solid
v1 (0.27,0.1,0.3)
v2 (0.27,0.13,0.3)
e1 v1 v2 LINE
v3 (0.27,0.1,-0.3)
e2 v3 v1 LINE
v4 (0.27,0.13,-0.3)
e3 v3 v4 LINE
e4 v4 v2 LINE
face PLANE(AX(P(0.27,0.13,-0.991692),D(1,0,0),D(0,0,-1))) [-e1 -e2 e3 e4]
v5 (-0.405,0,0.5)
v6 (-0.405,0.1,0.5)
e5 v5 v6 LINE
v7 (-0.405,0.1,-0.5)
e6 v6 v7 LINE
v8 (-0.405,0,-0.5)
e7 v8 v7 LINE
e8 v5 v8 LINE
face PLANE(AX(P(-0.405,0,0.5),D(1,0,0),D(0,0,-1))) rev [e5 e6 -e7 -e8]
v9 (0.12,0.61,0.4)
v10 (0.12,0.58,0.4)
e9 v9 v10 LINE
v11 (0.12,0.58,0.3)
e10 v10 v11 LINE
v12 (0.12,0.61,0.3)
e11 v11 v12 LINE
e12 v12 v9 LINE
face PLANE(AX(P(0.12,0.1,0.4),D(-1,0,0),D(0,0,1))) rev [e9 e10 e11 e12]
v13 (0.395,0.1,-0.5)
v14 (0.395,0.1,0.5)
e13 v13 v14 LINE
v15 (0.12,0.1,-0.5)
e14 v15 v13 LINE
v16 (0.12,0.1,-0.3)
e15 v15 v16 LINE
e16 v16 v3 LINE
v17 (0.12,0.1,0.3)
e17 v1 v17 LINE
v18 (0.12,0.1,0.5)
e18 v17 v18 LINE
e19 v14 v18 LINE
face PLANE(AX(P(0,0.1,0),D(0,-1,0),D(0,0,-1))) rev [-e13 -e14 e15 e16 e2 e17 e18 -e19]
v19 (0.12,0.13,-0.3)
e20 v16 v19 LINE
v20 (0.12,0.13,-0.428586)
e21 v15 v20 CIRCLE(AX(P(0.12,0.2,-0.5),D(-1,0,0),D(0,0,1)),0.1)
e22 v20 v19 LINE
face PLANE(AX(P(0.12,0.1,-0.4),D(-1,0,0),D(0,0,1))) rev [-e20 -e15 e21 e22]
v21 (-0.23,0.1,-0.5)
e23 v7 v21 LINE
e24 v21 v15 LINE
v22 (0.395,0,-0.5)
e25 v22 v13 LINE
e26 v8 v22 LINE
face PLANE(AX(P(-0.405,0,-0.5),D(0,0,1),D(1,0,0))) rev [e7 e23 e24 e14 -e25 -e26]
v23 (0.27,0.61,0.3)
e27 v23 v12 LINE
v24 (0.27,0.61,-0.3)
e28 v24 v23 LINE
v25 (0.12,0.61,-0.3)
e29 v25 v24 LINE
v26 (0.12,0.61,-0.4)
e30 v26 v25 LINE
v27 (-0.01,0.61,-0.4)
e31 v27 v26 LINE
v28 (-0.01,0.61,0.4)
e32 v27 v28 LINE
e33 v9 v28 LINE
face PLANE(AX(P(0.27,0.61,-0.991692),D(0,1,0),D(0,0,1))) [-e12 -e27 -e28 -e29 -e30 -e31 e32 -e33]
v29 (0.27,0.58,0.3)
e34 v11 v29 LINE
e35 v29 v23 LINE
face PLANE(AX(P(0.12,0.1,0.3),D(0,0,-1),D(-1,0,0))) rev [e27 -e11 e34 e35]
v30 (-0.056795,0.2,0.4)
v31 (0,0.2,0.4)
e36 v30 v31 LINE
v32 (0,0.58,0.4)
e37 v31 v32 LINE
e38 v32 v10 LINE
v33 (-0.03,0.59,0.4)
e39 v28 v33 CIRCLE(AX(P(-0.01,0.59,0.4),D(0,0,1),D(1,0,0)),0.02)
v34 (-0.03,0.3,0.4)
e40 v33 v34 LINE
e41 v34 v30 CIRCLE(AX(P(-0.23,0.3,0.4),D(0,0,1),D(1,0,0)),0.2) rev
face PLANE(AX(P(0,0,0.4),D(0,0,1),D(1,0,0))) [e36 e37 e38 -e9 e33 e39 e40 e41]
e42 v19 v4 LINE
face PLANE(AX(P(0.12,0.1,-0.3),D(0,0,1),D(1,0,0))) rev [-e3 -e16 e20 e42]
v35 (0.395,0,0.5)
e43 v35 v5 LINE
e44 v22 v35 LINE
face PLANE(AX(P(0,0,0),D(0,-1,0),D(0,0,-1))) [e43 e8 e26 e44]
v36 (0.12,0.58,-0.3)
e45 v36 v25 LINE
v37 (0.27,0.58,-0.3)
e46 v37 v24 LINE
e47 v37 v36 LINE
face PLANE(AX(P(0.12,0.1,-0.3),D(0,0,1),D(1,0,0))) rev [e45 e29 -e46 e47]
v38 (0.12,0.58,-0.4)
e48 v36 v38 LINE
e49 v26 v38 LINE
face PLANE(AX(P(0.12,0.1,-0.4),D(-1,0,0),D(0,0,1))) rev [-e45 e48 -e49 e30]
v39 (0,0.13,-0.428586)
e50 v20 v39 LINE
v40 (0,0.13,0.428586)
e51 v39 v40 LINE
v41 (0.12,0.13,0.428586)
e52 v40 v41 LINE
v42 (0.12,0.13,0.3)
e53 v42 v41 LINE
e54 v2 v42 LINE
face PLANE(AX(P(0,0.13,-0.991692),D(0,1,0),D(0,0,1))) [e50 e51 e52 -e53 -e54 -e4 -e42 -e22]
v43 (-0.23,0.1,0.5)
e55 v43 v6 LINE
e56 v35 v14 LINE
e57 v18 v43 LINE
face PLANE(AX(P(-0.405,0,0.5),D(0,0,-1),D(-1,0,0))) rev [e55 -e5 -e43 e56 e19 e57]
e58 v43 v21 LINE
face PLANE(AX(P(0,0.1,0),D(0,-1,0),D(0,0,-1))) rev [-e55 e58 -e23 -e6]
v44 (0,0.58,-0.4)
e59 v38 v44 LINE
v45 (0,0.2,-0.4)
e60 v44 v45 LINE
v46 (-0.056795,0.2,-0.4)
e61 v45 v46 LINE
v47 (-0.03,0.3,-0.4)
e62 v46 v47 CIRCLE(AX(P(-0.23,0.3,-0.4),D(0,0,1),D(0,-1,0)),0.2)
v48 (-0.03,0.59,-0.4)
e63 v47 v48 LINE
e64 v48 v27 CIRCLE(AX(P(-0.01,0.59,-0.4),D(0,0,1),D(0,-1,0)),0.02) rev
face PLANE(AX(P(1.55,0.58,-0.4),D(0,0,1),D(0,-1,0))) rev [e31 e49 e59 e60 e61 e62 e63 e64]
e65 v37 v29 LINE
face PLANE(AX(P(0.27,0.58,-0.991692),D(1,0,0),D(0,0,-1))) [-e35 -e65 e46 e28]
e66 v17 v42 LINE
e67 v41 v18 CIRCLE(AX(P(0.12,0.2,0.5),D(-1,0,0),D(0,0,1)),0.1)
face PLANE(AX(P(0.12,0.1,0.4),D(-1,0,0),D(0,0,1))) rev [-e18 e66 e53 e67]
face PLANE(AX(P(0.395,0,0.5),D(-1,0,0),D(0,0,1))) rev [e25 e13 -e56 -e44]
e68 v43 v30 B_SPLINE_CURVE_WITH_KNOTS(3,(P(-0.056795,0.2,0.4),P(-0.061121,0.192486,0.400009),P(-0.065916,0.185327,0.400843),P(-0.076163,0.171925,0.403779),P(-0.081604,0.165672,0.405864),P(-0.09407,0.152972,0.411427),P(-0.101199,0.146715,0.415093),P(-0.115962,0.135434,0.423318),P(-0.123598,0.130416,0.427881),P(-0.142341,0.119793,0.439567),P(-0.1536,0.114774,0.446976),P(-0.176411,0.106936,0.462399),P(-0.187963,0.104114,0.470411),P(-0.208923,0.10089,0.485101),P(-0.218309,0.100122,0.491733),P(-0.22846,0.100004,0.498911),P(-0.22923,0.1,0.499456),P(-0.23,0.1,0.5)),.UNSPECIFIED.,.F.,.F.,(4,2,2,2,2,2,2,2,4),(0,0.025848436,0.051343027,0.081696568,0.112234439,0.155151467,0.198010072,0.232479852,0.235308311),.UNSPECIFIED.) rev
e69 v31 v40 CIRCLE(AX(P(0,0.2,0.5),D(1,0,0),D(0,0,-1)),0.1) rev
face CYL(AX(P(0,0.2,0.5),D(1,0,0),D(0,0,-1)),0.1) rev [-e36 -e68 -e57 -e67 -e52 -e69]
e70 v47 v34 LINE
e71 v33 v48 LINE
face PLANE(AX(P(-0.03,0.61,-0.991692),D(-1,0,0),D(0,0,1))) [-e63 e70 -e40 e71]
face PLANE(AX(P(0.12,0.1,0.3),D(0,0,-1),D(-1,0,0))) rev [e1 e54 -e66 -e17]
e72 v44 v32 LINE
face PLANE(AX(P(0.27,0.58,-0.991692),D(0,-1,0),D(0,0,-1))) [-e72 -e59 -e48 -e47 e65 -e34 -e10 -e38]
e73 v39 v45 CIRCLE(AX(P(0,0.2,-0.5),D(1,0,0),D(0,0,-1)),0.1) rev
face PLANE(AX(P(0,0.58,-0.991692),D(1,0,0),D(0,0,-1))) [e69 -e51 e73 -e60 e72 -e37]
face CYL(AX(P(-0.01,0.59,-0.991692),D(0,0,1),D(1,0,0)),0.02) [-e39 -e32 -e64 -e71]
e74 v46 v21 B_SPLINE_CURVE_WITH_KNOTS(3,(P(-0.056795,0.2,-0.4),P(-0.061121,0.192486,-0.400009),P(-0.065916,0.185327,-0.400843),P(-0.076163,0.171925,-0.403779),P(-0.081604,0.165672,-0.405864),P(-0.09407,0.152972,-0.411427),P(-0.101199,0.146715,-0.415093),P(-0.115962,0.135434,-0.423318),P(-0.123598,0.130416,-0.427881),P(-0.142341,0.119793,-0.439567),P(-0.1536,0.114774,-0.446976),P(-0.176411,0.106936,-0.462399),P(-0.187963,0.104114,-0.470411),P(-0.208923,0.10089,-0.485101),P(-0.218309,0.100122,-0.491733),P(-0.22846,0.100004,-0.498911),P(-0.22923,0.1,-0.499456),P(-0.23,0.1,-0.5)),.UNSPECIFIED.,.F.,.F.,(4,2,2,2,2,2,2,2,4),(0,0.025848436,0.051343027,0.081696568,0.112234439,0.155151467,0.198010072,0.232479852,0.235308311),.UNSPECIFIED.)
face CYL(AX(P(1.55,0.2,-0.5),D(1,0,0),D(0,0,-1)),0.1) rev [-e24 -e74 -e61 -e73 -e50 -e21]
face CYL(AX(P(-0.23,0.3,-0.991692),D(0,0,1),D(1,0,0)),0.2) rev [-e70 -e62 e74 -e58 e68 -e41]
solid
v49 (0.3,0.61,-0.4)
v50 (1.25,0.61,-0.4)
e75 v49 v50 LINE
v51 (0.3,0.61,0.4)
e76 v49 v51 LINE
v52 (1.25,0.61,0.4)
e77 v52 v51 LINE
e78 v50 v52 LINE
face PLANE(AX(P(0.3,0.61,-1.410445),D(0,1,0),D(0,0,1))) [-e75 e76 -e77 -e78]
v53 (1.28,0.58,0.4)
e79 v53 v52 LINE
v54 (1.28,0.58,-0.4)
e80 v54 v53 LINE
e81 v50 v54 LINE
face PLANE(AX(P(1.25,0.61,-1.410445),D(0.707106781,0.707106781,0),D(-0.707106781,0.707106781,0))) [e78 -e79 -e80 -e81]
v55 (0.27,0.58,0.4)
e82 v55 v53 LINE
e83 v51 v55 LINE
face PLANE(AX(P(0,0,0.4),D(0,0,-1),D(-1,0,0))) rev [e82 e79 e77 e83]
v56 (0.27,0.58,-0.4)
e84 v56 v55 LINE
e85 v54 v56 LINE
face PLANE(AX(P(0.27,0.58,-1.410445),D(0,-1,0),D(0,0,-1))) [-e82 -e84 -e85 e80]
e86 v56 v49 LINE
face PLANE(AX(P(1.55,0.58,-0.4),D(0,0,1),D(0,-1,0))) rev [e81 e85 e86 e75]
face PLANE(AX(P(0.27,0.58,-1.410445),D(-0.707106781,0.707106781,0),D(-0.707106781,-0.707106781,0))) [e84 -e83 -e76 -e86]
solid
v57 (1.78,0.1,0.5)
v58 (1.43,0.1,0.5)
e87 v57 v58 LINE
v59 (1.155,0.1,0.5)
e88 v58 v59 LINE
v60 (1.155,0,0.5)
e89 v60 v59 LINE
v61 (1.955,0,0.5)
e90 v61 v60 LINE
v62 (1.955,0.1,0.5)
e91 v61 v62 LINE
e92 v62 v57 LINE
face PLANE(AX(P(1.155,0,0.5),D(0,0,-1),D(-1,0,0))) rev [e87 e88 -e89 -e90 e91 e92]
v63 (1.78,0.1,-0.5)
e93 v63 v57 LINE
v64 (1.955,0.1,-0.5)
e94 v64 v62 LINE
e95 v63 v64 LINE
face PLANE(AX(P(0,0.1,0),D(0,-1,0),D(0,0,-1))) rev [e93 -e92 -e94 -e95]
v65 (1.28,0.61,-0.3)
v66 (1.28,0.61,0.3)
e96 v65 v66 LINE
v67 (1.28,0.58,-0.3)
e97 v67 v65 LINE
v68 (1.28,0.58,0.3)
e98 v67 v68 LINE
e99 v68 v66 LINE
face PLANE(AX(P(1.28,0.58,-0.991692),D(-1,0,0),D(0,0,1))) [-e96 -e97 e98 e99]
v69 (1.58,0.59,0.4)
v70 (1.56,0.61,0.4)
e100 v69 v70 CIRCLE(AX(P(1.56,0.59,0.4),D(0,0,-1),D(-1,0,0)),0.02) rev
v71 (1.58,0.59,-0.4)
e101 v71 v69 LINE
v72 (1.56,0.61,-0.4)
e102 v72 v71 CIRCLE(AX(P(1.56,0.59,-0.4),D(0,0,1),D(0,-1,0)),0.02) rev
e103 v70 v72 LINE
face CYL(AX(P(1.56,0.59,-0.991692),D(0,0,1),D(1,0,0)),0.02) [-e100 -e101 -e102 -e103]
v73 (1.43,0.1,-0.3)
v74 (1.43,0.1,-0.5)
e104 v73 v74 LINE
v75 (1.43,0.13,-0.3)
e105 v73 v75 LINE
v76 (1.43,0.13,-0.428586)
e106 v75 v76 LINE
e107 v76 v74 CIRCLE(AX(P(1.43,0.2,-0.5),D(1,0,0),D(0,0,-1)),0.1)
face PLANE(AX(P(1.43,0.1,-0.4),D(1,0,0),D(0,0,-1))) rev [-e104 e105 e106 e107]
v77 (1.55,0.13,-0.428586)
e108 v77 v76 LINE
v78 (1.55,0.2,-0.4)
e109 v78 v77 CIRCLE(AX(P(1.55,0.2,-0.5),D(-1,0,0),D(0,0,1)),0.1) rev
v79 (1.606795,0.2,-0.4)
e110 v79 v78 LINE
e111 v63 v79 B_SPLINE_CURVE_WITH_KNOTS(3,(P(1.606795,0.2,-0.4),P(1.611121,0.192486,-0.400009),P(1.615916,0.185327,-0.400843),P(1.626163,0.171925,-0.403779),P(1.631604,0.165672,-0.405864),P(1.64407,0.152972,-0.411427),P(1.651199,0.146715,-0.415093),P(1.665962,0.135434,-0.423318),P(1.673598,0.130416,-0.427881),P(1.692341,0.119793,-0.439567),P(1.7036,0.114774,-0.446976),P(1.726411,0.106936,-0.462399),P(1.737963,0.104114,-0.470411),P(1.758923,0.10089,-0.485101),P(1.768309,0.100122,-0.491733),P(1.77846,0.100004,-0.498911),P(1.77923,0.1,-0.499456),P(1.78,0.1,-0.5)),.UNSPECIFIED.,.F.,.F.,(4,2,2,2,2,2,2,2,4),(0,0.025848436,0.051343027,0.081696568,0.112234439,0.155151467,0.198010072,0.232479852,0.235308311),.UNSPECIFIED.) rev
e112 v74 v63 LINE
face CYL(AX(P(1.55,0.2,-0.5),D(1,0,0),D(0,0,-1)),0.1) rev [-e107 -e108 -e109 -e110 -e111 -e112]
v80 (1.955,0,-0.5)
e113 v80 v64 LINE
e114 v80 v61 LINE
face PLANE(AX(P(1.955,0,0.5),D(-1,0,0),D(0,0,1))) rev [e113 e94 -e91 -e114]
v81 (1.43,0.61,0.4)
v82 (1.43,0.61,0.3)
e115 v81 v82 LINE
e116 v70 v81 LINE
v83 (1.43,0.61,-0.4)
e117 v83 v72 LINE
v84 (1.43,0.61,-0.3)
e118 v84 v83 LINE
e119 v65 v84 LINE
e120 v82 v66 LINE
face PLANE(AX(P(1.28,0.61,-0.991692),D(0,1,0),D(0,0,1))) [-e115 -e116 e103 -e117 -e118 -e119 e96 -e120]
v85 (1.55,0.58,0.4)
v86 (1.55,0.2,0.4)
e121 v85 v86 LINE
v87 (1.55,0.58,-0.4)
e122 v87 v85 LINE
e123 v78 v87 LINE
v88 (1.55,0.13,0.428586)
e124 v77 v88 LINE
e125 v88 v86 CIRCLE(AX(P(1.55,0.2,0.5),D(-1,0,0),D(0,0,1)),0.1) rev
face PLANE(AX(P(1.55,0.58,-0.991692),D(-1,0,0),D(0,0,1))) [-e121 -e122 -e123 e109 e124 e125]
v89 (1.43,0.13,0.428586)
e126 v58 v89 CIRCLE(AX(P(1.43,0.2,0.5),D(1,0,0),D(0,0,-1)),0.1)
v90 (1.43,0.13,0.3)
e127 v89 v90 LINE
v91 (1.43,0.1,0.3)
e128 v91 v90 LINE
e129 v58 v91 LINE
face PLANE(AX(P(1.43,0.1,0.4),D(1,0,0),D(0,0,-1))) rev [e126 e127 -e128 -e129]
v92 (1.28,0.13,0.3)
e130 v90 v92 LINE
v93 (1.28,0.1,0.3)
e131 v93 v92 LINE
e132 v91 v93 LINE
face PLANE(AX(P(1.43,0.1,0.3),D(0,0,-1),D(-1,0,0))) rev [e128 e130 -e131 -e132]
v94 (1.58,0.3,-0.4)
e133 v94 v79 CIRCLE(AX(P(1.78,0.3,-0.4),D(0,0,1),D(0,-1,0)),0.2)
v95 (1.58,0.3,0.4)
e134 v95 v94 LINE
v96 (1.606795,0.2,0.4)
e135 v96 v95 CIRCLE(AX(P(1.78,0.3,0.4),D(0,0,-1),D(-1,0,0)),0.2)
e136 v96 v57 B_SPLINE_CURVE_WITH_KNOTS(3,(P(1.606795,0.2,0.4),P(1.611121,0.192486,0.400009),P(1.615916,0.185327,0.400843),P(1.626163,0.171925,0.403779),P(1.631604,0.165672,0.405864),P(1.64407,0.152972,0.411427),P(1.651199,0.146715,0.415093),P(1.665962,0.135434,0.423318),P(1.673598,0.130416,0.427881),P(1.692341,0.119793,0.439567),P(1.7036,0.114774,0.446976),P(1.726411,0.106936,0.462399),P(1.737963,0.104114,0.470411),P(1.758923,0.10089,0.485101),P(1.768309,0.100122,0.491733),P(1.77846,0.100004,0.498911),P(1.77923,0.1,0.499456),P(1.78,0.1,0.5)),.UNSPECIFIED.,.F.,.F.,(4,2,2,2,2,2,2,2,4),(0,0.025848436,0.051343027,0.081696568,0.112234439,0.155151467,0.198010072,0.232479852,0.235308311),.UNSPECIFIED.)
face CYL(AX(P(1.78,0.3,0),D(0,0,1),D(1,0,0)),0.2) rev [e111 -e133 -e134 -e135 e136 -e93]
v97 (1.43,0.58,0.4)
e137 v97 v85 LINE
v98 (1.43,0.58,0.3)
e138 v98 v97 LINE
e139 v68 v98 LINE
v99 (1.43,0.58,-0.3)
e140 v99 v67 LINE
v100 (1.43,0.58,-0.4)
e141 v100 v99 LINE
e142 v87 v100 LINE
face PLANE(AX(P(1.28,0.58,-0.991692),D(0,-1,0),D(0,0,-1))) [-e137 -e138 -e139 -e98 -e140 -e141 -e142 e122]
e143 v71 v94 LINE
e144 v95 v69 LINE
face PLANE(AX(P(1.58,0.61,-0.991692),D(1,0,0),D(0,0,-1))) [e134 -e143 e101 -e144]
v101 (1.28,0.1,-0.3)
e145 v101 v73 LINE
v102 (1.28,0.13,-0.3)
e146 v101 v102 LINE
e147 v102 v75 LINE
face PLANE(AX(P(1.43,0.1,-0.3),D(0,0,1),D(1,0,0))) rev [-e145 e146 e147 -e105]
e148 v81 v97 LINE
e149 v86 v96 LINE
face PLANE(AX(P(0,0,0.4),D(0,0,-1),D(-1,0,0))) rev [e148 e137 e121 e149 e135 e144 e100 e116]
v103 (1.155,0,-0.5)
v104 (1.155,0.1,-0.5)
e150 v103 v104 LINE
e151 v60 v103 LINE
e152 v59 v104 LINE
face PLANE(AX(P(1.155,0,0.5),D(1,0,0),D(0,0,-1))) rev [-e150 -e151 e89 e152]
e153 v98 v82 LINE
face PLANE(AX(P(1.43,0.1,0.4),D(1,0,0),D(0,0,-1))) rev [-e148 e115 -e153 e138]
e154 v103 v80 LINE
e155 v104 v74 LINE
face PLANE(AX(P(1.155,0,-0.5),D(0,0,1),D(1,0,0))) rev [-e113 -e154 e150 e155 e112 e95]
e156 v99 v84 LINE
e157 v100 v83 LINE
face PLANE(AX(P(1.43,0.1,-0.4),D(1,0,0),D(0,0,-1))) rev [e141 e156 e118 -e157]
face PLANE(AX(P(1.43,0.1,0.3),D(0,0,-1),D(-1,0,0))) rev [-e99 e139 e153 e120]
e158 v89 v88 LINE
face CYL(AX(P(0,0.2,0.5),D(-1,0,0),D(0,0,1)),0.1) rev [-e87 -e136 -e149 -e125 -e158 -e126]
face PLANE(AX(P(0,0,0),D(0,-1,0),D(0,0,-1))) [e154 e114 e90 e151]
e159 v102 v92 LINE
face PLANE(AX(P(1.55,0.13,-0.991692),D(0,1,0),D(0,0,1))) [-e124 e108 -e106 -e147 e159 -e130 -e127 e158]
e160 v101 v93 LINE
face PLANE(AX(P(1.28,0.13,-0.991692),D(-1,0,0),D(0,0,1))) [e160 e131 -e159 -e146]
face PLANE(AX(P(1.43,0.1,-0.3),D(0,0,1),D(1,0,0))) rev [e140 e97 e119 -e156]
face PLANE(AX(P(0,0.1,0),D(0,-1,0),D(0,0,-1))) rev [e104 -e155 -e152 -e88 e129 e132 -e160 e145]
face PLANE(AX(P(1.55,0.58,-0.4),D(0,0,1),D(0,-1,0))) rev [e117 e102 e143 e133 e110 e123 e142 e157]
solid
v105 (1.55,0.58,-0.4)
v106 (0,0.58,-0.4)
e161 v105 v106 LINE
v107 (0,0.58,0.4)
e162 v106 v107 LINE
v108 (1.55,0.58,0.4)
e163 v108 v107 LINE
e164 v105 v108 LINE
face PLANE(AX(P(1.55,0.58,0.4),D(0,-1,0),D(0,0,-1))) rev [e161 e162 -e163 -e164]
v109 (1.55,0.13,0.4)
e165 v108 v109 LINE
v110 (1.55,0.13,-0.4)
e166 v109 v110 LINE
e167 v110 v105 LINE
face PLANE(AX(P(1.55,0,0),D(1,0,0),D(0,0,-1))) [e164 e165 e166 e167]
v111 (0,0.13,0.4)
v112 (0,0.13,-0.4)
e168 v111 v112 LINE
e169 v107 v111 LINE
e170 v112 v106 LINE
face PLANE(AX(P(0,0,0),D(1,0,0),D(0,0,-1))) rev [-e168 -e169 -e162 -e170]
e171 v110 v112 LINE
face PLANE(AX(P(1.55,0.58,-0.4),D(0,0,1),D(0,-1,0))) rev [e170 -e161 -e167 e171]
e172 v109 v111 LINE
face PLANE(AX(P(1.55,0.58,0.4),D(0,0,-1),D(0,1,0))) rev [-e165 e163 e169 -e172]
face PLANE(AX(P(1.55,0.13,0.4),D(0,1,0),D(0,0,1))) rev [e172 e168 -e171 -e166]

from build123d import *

# Parameters (mm, degrees)
SKETCH1_W             = 0.8
SKETCH1_H             = 0.45
BOSS_EXTRUDE1_DEPTH   = 1.55
BOSS_EXTRUDE2_DEPTH   = 0.8
BOSS_EXTRUDE2_2_DEPTH = 0.8
FILLET1_R             = 0.02
FILLET2_R             = 0.02
SKETCH3_W             = 0.15
SKETCH3_H             = 0.1
CUT_EXTRUDE1_DEPTH    = 2.707776332
BOSS_EXTRUDE3_DEPTH   = 0.8
SKETCH5_W             = 0.8
SKETCH5_H             = 1
BOSS_EXTRUDE4_DEPTH   = 0.1
FILLET3_R             = 0.2
FILLET4_R             = 0.2
FILLET5_START         = -0.087971281
FILLET5_DEPTH         = 0.087971281
FILLET5_START_2       = -0.2300001
FILLET5_2_DEPTH       = 0.142028819
FILLET5_START_3       = -0.0299999
FILLET5_3_DEPTH       = 0.1499999
FILLET5_START_4       = -2
FILLET5_4_OUTLINE_W   = 0.12
FILLET5_4_OUTLINE_H   = 0.07
FILLET5_4_DEPTH       = 3
FILLET6_START         = 1.43
FILLET6_DEPTH         = 0.209188627
FILLET6_START_2       = 1.55
FILLET6_2_DEPTH       = 0.0299999
FILLET6_START_3       = -0.5
FILLET6_3_DEPTH       = 1
FILLET6_START_4       = -0.3
FILLET6_4_OUTLINE_W   = 0.359188627
FILLET6_4_OUTLINE_H   = 0.03
FILLET6_4_OUTLINE_W_2 = 0.15
FILLET6_4_DEPTH       = 0.6
FILLET6_5_OUTLINE_W   = 0.209188627
FILLET6_5_OUTLINE_H   = 0.03
FILLET6_5_DEPTH       = 0.9
FILLET6_6_DEPTH       = 0.35


with BuildPart() as part:
    # Sketch1 → Boss-Extrude1 (new body)
    with BuildSketch(Plane(origin=(0, 0, 0), x_dir=(0, 0, -1), z_dir=(1, 0, 0))):
        with Locations((0, 0.355)):
            Rectangle(SKETCH1_W, SKETCH1_H)
    extrude(amount=BOSS_EXTRUDE1_DEPTH)


with BuildPart() as body_2:
    # Sketch2 → Boss-Extrude2 (new body)
    with BuildSketch(Plane.XY.offset(0.4)):
        Polygon((0.27, 0.58), (0, 0.58), (0, 0.13), (0.27, 0.13), (0.27, 0.1), (-0.03, 0.1), (-0.03, 0.61), (0.27, 0.61), align=None)
    extrude(amount=-BOSS_EXTRUDE2_DEPTH)

    # Fillet2
    fillet2_edges = [body_2.edges().sort_by_distance(p)[0] for p in [
        (-0.03, 0.61, 0),
    ]]
    fillet(fillet2_edges, radius=FILLET2_R)


with BuildPart() as body_3:
    # Sketch2 → Boss-Extrude2 2 (new body)
    with BuildSketch(Plane.XY.offset(0.4)):
        Polygon((1.28, 0.13), (1.28, 0.1), (1.58, 0.1), (1.58, 0.61), (1.28, 0.61), (1.28, 0.58), (1.55, 0.58), (1.55, 0.13), align=None)
    extrude(amount=-BOSS_EXTRUDE2_2_DEPTH)

    # Fillet1
    fillet1_edges = [body_3.edges().sort_by_distance(p)[0] for p in [
        (1.58, 0.61, 0),
    ]]
    fillet(fillet1_edges, radius=FILLET1_R)


with BuildPart() as cut_extrude1_tool:
    # Sketch3 → Cut-Extrude1 (new, through all)
    with BuildSketch(Plane(origin=(0, 0.61, 0), x_dir=(1, 0, 0), z_dir=(0, 1, 0))):
        with Locations((0.195, 0.35)):
            Rectangle(SKETCH3_W, SKETCH3_H)
        with Locations((1.355, 0.35)):
            Rectangle(SKETCH3_W, SKETCH3_H)
        with Locations((1.355, -0.35)):
            Rectangle(SKETCH3_W, SKETCH3_H)
        with Locations((0.195, -0.35)):
            Rectangle(SKETCH3_W, SKETCH3_H)
    extrude(amount=-CUT_EXTRUDE1_DEPTH)


with BuildPart() as body_2_1:
    add(body_2.part)

    # Cut-Extrude1: cut by cut_extrude1_tool
    add(cut_extrude1_tool.part, mode=Mode.SUBTRACT)



with BuildPart() as body_3_1:
    add(body_3.part)

    # Cut-Extrude1: cut by cut_extrude1_tool
    add(cut_extrude1_tool.part, mode=Mode.SUBTRACT)


with BuildPart() as body_4:
    # Sketch4 → Boss-Extrude3 (new body)
    with BuildSketch(Plane.XY.offset(0.4)):
        Polygon((0.27, 0.58), (1.28, 0.58), (1.25, 0.61), (0.3, 0.61), align=None)
    extrude(amount=-BOSS_EXTRUDE3_DEPTH)


with BuildPart() as body_2_2:
    add(body_2_1.part)

    add(body_3_1.part)  # Boss-Extrude4 merges body 3
    # Sketch5 → Boss-Extrude4 (add)
    with BuildSketch(Plane.XZ.offset(-0.1)):
        with Locations((-0.005, 0)):
            Rectangle(SKETCH5_W, SKETCH5_H)
        with Locations((1.555, 0)):
            Rectangle(SKETCH5_W, SKETCH5_H)
    extrude(amount=BOSS_EXTRUDE4_DEPTH)

    # Fillet3
    fillet3_edges = [body_2_2.edges().sort_by_distance(p)[0] for p in [
        (-0.03, 0.1, 0),
    ]]
    fillet(fillet3_edges, radius=FILLET3_R)

    # Fillet4
    fillet4_edges = [body_2_2.edges().sort_by_distance(p)[0] for p in [
        (1.58, 0.1, 0),
    ]]
    fillet(fillet4_edges, radius=FILLET4_R)

    # Fillet5: read off the stored shape, not the designer's step
    # Fillet5 outline → Fillet5 (add)
    with BuildSketch(Plane.YZ.offset(FILLET5_START)):
        with BuildLine():
            Line((0.1, 0.5), (0.1, 0.4))
            Line((0.1, 0.4), (0.2, 0.4))
            ThreePointArc((0.2, 0.4), (0.129289322, 0.429289322), (0.1, 0.5))
        make_face()
        with BuildLine():
            ThreePointArc((0.1, -0.5), (0.129289322, -0.429289322), (0.2, -0.4))
            Line((0.2, -0.4), (0.1, -0.4))
            Line((0.1, -0.4), (0.1, -0.5))
        make_face()
    extrude(amount=FILLET5_DEPTH)

    # Fillet5 2 outline → Fillet5 2 (add)
    with BuildSketch(Plane.YZ.offset(FILLET5_START_2)):
        with BuildLine():
            Line((0.1, 0.5), (0.1, 0.4))
            Line((0.1, 0.4), (0.2, 0.4))
            ThreePointArc((0.2, 0.4), (0.129289322, 0.429289322), (0.1, 0.5))
        make_face()
        with BuildLine():
            ThreePointArc((0.1, -0.5), (0.129289322, -0.429289322), (0.2, -0.4))
            Line((0.2, -0.4), (0.1, -0.4))
            Line((0.1, -0.4), (0.1, -0.5))
        make_face()
    extrude(amount=FILLET5_2_DEPTH)

    # Fillet5 3 outline → Fillet5 3 (add)
    with BuildSketch(Plane.YZ.offset(FILLET5_START_3)):
        with BuildLine():
            Line((0.1, 0.5), (0.1, 0.4))
            Line((0.1, 0.4), (0.2, 0.4))
            ThreePointArc((0.2, 0.4), (0.129289322, 0.429289322), (0.1, 0.5))
        make_face()
        with BuildLine():
            ThreePointArc((0.1, -0.5), (0.129289322, -0.429289322), (0.2, -0.4))
            Line((0.2, -0.4), (0.1, -0.4))
            Line((0.1, -0.4), (0.1, -0.5))
        make_face()
    extrude(amount=FILLET5_3_DEPTH)

    # Fillet5 4 outline → Fillet5 4 (cut)
    with BuildSketch(Plane.XY.offset(FILLET5_START_4)):
        with Locations((0.06, 0.165)):
            Rectangle(FILLET5_4_OUTLINE_W, FILLET5_4_OUTLINE_H)
        with BuildLine():
            Line((-0.2300001, 0.2), (-0.23000005, 0.1))
            ThreePointArc((-0.23000005, 0.1), (-0.130000022, 0.126794907), (-0.056794919, 0.2))
            Line((-0.056794919, 0.2), (-0.2300001, 0.2))
        make_face()
    extrude(amount=FILLET5_4_DEPTH, mode=Mode.SUBTRACT)

    # Fillet6: read off the stored shape, not the designer's step
    # Fillet6 outline → Fillet6 (add)
    with BuildSketch(Plane.YZ.offset(FILLET6_START)):
        with BuildLine():
            ThreePointArc((0.1, -0.5), (0.107804555, -0.461270167), (0.13, -0.428585716))
            Line((0.13, -0.428585716), (0.13, -0.4))
            Line((0.13, -0.4), (0.1, -0.4))
            Line((0.1, -0.4), (0.1, -0.5))
        make_face()
        with BuildLine():
            Line((0.1, 0.4), (0.13, 0.4))
            Line((0.13, 0.4), (0.13, 0.428585716))
            ThreePointArc((0.13, 0.428585716), (0.107804555, 0.461270167), (0.1, 0.5))
            Line((0.1, 0.5), (0.1, 0.4))
        make_face()
    extrude(amount=FILLET6_DEPTH)

    # Fillet6 2 outline → Fillet6 2 (add)
    with BuildSketch(Plane.YZ.offset(FILLET6_START_2)):
        with BuildLine():
            ThreePointArc((0.13, -0.428585716), (0.162194104, -0.407421848), (0.2, -0.4))
            Line((0.2, -0.4), (0.13, -0.4))
            Line((0.13, -0.4), (0.13, -0.428585716))
        make_face()
        with BuildLine():
            Line((0.13, 0.428585716), (0.13, 0.4))
            Line((0.13, 0.4), (0.2, 0.4))
            ThreePointArc((0.2, 0.4), (0.162194104, 0.407421848), (0.13, 0.428585716))
        make_face()
    extrude(amount=FILLET6_2_DEPTH)

    # Fillet6 3 outline → Fillet6 3 (add)
    with BuildSketch(Plane.XY.offset(FILLET6_START_3)):
        with BuildLine():
            Line((1.639188627, 0.1), (1.155, 0.1))
            Line((1.155, 0.1), (1.155, 0))
            Line((1.155, 0), (1.955, 0))
            Line((1.955, 0), (1.955, 0.1))
            Line((1.955, 0.1), (1.78, 0.1))
            ThreePointArc((1.78, 0.1), (1.638578644, 0.158578644), (1.58, 0.3))
            Line((1.58, 0.3), (1.58, 0.59))
            ThreePointArc((1.58, 0.59), (1.574142136, 0.604142136), (1.56, 0.61))
            Line((1.56, 0.61), (1.43, 0.61))
            Line((1.43, 0.61), (1.43, 0.58))
            Line((1.43, 0.58), (1.55, 0.58))
            Line((1.55, 0.58), (1.55, 0.13))
            Line((1.55, 0.13), (1.5799999, 0.13))
            Line((1.5799999, 0.13), (1.639188627, 0.13))
            Line((1.639188627, 0.13), (1.639188627, 0.1))
        make_face()
    extrude(amount=FILLET6_3_DEPTH)

    # Fillet6 4 outline → Fillet6 4 (add)
    with BuildSketch(Plane.XY.offset(FILLET6_START_4)):
        with Locations((1.459594314, 0.115)):
            Rectangle(FILLET6_4_OUTLINE_W, FILLET6_4_OUTLINE_H)
        with Locations((1.355, 0.595)):
            Rectangle(FILLET6_4_OUTLINE_W_2, FILLET6_4_OUTLINE_H)
    extrude(amount=FILLET6_4_DEPTH)

    # Fillet6 5 outline → Fillet6 5 (add)
    with BuildSketch(Plane.XY.offset(FILLET6_START_3)):
        with Locations((1.534594313, 0.115)):
            Rectangle(FILLET6_5_OUTLINE_W, FILLET6_5_OUTLINE_H)
    extrude(amount=FILLET6_5_DEPTH)

    # Fillet6 6 outline → Fillet6 6 (cut)
    with BuildSketch(Plane.YZ.offset(FILLET6_START)):
        with BuildLine():
            Line((0.2, 0.4), (0.61, 0.4))
            Line((0.61, 0.4), (0.61, 0.5))
            Line((0.61, 0.5), (0.1, 0.5))
            ThreePointArc((0.1, 0.5), (0.129289322, 0.429289322), (0.2, 0.4))
        make_face()
        with BuildLine():
            Line((0.1, -0.5), (0.61, -0.5))
            Line((0.61, -0.5), (0.61, -0.4))
            Line((0.61, -0.4), (0.2, -0.4))
            ThreePointArc((0.2, -0.4), (0.129289322, -0.429289322), (0.1, -0.5))
        make_face()
    extrude(amount=FILLET6_6_DEPTH, mode=Mode.SUBTRACT)


solid = Compound([part.part, body_4.part, body_2_2.part])
